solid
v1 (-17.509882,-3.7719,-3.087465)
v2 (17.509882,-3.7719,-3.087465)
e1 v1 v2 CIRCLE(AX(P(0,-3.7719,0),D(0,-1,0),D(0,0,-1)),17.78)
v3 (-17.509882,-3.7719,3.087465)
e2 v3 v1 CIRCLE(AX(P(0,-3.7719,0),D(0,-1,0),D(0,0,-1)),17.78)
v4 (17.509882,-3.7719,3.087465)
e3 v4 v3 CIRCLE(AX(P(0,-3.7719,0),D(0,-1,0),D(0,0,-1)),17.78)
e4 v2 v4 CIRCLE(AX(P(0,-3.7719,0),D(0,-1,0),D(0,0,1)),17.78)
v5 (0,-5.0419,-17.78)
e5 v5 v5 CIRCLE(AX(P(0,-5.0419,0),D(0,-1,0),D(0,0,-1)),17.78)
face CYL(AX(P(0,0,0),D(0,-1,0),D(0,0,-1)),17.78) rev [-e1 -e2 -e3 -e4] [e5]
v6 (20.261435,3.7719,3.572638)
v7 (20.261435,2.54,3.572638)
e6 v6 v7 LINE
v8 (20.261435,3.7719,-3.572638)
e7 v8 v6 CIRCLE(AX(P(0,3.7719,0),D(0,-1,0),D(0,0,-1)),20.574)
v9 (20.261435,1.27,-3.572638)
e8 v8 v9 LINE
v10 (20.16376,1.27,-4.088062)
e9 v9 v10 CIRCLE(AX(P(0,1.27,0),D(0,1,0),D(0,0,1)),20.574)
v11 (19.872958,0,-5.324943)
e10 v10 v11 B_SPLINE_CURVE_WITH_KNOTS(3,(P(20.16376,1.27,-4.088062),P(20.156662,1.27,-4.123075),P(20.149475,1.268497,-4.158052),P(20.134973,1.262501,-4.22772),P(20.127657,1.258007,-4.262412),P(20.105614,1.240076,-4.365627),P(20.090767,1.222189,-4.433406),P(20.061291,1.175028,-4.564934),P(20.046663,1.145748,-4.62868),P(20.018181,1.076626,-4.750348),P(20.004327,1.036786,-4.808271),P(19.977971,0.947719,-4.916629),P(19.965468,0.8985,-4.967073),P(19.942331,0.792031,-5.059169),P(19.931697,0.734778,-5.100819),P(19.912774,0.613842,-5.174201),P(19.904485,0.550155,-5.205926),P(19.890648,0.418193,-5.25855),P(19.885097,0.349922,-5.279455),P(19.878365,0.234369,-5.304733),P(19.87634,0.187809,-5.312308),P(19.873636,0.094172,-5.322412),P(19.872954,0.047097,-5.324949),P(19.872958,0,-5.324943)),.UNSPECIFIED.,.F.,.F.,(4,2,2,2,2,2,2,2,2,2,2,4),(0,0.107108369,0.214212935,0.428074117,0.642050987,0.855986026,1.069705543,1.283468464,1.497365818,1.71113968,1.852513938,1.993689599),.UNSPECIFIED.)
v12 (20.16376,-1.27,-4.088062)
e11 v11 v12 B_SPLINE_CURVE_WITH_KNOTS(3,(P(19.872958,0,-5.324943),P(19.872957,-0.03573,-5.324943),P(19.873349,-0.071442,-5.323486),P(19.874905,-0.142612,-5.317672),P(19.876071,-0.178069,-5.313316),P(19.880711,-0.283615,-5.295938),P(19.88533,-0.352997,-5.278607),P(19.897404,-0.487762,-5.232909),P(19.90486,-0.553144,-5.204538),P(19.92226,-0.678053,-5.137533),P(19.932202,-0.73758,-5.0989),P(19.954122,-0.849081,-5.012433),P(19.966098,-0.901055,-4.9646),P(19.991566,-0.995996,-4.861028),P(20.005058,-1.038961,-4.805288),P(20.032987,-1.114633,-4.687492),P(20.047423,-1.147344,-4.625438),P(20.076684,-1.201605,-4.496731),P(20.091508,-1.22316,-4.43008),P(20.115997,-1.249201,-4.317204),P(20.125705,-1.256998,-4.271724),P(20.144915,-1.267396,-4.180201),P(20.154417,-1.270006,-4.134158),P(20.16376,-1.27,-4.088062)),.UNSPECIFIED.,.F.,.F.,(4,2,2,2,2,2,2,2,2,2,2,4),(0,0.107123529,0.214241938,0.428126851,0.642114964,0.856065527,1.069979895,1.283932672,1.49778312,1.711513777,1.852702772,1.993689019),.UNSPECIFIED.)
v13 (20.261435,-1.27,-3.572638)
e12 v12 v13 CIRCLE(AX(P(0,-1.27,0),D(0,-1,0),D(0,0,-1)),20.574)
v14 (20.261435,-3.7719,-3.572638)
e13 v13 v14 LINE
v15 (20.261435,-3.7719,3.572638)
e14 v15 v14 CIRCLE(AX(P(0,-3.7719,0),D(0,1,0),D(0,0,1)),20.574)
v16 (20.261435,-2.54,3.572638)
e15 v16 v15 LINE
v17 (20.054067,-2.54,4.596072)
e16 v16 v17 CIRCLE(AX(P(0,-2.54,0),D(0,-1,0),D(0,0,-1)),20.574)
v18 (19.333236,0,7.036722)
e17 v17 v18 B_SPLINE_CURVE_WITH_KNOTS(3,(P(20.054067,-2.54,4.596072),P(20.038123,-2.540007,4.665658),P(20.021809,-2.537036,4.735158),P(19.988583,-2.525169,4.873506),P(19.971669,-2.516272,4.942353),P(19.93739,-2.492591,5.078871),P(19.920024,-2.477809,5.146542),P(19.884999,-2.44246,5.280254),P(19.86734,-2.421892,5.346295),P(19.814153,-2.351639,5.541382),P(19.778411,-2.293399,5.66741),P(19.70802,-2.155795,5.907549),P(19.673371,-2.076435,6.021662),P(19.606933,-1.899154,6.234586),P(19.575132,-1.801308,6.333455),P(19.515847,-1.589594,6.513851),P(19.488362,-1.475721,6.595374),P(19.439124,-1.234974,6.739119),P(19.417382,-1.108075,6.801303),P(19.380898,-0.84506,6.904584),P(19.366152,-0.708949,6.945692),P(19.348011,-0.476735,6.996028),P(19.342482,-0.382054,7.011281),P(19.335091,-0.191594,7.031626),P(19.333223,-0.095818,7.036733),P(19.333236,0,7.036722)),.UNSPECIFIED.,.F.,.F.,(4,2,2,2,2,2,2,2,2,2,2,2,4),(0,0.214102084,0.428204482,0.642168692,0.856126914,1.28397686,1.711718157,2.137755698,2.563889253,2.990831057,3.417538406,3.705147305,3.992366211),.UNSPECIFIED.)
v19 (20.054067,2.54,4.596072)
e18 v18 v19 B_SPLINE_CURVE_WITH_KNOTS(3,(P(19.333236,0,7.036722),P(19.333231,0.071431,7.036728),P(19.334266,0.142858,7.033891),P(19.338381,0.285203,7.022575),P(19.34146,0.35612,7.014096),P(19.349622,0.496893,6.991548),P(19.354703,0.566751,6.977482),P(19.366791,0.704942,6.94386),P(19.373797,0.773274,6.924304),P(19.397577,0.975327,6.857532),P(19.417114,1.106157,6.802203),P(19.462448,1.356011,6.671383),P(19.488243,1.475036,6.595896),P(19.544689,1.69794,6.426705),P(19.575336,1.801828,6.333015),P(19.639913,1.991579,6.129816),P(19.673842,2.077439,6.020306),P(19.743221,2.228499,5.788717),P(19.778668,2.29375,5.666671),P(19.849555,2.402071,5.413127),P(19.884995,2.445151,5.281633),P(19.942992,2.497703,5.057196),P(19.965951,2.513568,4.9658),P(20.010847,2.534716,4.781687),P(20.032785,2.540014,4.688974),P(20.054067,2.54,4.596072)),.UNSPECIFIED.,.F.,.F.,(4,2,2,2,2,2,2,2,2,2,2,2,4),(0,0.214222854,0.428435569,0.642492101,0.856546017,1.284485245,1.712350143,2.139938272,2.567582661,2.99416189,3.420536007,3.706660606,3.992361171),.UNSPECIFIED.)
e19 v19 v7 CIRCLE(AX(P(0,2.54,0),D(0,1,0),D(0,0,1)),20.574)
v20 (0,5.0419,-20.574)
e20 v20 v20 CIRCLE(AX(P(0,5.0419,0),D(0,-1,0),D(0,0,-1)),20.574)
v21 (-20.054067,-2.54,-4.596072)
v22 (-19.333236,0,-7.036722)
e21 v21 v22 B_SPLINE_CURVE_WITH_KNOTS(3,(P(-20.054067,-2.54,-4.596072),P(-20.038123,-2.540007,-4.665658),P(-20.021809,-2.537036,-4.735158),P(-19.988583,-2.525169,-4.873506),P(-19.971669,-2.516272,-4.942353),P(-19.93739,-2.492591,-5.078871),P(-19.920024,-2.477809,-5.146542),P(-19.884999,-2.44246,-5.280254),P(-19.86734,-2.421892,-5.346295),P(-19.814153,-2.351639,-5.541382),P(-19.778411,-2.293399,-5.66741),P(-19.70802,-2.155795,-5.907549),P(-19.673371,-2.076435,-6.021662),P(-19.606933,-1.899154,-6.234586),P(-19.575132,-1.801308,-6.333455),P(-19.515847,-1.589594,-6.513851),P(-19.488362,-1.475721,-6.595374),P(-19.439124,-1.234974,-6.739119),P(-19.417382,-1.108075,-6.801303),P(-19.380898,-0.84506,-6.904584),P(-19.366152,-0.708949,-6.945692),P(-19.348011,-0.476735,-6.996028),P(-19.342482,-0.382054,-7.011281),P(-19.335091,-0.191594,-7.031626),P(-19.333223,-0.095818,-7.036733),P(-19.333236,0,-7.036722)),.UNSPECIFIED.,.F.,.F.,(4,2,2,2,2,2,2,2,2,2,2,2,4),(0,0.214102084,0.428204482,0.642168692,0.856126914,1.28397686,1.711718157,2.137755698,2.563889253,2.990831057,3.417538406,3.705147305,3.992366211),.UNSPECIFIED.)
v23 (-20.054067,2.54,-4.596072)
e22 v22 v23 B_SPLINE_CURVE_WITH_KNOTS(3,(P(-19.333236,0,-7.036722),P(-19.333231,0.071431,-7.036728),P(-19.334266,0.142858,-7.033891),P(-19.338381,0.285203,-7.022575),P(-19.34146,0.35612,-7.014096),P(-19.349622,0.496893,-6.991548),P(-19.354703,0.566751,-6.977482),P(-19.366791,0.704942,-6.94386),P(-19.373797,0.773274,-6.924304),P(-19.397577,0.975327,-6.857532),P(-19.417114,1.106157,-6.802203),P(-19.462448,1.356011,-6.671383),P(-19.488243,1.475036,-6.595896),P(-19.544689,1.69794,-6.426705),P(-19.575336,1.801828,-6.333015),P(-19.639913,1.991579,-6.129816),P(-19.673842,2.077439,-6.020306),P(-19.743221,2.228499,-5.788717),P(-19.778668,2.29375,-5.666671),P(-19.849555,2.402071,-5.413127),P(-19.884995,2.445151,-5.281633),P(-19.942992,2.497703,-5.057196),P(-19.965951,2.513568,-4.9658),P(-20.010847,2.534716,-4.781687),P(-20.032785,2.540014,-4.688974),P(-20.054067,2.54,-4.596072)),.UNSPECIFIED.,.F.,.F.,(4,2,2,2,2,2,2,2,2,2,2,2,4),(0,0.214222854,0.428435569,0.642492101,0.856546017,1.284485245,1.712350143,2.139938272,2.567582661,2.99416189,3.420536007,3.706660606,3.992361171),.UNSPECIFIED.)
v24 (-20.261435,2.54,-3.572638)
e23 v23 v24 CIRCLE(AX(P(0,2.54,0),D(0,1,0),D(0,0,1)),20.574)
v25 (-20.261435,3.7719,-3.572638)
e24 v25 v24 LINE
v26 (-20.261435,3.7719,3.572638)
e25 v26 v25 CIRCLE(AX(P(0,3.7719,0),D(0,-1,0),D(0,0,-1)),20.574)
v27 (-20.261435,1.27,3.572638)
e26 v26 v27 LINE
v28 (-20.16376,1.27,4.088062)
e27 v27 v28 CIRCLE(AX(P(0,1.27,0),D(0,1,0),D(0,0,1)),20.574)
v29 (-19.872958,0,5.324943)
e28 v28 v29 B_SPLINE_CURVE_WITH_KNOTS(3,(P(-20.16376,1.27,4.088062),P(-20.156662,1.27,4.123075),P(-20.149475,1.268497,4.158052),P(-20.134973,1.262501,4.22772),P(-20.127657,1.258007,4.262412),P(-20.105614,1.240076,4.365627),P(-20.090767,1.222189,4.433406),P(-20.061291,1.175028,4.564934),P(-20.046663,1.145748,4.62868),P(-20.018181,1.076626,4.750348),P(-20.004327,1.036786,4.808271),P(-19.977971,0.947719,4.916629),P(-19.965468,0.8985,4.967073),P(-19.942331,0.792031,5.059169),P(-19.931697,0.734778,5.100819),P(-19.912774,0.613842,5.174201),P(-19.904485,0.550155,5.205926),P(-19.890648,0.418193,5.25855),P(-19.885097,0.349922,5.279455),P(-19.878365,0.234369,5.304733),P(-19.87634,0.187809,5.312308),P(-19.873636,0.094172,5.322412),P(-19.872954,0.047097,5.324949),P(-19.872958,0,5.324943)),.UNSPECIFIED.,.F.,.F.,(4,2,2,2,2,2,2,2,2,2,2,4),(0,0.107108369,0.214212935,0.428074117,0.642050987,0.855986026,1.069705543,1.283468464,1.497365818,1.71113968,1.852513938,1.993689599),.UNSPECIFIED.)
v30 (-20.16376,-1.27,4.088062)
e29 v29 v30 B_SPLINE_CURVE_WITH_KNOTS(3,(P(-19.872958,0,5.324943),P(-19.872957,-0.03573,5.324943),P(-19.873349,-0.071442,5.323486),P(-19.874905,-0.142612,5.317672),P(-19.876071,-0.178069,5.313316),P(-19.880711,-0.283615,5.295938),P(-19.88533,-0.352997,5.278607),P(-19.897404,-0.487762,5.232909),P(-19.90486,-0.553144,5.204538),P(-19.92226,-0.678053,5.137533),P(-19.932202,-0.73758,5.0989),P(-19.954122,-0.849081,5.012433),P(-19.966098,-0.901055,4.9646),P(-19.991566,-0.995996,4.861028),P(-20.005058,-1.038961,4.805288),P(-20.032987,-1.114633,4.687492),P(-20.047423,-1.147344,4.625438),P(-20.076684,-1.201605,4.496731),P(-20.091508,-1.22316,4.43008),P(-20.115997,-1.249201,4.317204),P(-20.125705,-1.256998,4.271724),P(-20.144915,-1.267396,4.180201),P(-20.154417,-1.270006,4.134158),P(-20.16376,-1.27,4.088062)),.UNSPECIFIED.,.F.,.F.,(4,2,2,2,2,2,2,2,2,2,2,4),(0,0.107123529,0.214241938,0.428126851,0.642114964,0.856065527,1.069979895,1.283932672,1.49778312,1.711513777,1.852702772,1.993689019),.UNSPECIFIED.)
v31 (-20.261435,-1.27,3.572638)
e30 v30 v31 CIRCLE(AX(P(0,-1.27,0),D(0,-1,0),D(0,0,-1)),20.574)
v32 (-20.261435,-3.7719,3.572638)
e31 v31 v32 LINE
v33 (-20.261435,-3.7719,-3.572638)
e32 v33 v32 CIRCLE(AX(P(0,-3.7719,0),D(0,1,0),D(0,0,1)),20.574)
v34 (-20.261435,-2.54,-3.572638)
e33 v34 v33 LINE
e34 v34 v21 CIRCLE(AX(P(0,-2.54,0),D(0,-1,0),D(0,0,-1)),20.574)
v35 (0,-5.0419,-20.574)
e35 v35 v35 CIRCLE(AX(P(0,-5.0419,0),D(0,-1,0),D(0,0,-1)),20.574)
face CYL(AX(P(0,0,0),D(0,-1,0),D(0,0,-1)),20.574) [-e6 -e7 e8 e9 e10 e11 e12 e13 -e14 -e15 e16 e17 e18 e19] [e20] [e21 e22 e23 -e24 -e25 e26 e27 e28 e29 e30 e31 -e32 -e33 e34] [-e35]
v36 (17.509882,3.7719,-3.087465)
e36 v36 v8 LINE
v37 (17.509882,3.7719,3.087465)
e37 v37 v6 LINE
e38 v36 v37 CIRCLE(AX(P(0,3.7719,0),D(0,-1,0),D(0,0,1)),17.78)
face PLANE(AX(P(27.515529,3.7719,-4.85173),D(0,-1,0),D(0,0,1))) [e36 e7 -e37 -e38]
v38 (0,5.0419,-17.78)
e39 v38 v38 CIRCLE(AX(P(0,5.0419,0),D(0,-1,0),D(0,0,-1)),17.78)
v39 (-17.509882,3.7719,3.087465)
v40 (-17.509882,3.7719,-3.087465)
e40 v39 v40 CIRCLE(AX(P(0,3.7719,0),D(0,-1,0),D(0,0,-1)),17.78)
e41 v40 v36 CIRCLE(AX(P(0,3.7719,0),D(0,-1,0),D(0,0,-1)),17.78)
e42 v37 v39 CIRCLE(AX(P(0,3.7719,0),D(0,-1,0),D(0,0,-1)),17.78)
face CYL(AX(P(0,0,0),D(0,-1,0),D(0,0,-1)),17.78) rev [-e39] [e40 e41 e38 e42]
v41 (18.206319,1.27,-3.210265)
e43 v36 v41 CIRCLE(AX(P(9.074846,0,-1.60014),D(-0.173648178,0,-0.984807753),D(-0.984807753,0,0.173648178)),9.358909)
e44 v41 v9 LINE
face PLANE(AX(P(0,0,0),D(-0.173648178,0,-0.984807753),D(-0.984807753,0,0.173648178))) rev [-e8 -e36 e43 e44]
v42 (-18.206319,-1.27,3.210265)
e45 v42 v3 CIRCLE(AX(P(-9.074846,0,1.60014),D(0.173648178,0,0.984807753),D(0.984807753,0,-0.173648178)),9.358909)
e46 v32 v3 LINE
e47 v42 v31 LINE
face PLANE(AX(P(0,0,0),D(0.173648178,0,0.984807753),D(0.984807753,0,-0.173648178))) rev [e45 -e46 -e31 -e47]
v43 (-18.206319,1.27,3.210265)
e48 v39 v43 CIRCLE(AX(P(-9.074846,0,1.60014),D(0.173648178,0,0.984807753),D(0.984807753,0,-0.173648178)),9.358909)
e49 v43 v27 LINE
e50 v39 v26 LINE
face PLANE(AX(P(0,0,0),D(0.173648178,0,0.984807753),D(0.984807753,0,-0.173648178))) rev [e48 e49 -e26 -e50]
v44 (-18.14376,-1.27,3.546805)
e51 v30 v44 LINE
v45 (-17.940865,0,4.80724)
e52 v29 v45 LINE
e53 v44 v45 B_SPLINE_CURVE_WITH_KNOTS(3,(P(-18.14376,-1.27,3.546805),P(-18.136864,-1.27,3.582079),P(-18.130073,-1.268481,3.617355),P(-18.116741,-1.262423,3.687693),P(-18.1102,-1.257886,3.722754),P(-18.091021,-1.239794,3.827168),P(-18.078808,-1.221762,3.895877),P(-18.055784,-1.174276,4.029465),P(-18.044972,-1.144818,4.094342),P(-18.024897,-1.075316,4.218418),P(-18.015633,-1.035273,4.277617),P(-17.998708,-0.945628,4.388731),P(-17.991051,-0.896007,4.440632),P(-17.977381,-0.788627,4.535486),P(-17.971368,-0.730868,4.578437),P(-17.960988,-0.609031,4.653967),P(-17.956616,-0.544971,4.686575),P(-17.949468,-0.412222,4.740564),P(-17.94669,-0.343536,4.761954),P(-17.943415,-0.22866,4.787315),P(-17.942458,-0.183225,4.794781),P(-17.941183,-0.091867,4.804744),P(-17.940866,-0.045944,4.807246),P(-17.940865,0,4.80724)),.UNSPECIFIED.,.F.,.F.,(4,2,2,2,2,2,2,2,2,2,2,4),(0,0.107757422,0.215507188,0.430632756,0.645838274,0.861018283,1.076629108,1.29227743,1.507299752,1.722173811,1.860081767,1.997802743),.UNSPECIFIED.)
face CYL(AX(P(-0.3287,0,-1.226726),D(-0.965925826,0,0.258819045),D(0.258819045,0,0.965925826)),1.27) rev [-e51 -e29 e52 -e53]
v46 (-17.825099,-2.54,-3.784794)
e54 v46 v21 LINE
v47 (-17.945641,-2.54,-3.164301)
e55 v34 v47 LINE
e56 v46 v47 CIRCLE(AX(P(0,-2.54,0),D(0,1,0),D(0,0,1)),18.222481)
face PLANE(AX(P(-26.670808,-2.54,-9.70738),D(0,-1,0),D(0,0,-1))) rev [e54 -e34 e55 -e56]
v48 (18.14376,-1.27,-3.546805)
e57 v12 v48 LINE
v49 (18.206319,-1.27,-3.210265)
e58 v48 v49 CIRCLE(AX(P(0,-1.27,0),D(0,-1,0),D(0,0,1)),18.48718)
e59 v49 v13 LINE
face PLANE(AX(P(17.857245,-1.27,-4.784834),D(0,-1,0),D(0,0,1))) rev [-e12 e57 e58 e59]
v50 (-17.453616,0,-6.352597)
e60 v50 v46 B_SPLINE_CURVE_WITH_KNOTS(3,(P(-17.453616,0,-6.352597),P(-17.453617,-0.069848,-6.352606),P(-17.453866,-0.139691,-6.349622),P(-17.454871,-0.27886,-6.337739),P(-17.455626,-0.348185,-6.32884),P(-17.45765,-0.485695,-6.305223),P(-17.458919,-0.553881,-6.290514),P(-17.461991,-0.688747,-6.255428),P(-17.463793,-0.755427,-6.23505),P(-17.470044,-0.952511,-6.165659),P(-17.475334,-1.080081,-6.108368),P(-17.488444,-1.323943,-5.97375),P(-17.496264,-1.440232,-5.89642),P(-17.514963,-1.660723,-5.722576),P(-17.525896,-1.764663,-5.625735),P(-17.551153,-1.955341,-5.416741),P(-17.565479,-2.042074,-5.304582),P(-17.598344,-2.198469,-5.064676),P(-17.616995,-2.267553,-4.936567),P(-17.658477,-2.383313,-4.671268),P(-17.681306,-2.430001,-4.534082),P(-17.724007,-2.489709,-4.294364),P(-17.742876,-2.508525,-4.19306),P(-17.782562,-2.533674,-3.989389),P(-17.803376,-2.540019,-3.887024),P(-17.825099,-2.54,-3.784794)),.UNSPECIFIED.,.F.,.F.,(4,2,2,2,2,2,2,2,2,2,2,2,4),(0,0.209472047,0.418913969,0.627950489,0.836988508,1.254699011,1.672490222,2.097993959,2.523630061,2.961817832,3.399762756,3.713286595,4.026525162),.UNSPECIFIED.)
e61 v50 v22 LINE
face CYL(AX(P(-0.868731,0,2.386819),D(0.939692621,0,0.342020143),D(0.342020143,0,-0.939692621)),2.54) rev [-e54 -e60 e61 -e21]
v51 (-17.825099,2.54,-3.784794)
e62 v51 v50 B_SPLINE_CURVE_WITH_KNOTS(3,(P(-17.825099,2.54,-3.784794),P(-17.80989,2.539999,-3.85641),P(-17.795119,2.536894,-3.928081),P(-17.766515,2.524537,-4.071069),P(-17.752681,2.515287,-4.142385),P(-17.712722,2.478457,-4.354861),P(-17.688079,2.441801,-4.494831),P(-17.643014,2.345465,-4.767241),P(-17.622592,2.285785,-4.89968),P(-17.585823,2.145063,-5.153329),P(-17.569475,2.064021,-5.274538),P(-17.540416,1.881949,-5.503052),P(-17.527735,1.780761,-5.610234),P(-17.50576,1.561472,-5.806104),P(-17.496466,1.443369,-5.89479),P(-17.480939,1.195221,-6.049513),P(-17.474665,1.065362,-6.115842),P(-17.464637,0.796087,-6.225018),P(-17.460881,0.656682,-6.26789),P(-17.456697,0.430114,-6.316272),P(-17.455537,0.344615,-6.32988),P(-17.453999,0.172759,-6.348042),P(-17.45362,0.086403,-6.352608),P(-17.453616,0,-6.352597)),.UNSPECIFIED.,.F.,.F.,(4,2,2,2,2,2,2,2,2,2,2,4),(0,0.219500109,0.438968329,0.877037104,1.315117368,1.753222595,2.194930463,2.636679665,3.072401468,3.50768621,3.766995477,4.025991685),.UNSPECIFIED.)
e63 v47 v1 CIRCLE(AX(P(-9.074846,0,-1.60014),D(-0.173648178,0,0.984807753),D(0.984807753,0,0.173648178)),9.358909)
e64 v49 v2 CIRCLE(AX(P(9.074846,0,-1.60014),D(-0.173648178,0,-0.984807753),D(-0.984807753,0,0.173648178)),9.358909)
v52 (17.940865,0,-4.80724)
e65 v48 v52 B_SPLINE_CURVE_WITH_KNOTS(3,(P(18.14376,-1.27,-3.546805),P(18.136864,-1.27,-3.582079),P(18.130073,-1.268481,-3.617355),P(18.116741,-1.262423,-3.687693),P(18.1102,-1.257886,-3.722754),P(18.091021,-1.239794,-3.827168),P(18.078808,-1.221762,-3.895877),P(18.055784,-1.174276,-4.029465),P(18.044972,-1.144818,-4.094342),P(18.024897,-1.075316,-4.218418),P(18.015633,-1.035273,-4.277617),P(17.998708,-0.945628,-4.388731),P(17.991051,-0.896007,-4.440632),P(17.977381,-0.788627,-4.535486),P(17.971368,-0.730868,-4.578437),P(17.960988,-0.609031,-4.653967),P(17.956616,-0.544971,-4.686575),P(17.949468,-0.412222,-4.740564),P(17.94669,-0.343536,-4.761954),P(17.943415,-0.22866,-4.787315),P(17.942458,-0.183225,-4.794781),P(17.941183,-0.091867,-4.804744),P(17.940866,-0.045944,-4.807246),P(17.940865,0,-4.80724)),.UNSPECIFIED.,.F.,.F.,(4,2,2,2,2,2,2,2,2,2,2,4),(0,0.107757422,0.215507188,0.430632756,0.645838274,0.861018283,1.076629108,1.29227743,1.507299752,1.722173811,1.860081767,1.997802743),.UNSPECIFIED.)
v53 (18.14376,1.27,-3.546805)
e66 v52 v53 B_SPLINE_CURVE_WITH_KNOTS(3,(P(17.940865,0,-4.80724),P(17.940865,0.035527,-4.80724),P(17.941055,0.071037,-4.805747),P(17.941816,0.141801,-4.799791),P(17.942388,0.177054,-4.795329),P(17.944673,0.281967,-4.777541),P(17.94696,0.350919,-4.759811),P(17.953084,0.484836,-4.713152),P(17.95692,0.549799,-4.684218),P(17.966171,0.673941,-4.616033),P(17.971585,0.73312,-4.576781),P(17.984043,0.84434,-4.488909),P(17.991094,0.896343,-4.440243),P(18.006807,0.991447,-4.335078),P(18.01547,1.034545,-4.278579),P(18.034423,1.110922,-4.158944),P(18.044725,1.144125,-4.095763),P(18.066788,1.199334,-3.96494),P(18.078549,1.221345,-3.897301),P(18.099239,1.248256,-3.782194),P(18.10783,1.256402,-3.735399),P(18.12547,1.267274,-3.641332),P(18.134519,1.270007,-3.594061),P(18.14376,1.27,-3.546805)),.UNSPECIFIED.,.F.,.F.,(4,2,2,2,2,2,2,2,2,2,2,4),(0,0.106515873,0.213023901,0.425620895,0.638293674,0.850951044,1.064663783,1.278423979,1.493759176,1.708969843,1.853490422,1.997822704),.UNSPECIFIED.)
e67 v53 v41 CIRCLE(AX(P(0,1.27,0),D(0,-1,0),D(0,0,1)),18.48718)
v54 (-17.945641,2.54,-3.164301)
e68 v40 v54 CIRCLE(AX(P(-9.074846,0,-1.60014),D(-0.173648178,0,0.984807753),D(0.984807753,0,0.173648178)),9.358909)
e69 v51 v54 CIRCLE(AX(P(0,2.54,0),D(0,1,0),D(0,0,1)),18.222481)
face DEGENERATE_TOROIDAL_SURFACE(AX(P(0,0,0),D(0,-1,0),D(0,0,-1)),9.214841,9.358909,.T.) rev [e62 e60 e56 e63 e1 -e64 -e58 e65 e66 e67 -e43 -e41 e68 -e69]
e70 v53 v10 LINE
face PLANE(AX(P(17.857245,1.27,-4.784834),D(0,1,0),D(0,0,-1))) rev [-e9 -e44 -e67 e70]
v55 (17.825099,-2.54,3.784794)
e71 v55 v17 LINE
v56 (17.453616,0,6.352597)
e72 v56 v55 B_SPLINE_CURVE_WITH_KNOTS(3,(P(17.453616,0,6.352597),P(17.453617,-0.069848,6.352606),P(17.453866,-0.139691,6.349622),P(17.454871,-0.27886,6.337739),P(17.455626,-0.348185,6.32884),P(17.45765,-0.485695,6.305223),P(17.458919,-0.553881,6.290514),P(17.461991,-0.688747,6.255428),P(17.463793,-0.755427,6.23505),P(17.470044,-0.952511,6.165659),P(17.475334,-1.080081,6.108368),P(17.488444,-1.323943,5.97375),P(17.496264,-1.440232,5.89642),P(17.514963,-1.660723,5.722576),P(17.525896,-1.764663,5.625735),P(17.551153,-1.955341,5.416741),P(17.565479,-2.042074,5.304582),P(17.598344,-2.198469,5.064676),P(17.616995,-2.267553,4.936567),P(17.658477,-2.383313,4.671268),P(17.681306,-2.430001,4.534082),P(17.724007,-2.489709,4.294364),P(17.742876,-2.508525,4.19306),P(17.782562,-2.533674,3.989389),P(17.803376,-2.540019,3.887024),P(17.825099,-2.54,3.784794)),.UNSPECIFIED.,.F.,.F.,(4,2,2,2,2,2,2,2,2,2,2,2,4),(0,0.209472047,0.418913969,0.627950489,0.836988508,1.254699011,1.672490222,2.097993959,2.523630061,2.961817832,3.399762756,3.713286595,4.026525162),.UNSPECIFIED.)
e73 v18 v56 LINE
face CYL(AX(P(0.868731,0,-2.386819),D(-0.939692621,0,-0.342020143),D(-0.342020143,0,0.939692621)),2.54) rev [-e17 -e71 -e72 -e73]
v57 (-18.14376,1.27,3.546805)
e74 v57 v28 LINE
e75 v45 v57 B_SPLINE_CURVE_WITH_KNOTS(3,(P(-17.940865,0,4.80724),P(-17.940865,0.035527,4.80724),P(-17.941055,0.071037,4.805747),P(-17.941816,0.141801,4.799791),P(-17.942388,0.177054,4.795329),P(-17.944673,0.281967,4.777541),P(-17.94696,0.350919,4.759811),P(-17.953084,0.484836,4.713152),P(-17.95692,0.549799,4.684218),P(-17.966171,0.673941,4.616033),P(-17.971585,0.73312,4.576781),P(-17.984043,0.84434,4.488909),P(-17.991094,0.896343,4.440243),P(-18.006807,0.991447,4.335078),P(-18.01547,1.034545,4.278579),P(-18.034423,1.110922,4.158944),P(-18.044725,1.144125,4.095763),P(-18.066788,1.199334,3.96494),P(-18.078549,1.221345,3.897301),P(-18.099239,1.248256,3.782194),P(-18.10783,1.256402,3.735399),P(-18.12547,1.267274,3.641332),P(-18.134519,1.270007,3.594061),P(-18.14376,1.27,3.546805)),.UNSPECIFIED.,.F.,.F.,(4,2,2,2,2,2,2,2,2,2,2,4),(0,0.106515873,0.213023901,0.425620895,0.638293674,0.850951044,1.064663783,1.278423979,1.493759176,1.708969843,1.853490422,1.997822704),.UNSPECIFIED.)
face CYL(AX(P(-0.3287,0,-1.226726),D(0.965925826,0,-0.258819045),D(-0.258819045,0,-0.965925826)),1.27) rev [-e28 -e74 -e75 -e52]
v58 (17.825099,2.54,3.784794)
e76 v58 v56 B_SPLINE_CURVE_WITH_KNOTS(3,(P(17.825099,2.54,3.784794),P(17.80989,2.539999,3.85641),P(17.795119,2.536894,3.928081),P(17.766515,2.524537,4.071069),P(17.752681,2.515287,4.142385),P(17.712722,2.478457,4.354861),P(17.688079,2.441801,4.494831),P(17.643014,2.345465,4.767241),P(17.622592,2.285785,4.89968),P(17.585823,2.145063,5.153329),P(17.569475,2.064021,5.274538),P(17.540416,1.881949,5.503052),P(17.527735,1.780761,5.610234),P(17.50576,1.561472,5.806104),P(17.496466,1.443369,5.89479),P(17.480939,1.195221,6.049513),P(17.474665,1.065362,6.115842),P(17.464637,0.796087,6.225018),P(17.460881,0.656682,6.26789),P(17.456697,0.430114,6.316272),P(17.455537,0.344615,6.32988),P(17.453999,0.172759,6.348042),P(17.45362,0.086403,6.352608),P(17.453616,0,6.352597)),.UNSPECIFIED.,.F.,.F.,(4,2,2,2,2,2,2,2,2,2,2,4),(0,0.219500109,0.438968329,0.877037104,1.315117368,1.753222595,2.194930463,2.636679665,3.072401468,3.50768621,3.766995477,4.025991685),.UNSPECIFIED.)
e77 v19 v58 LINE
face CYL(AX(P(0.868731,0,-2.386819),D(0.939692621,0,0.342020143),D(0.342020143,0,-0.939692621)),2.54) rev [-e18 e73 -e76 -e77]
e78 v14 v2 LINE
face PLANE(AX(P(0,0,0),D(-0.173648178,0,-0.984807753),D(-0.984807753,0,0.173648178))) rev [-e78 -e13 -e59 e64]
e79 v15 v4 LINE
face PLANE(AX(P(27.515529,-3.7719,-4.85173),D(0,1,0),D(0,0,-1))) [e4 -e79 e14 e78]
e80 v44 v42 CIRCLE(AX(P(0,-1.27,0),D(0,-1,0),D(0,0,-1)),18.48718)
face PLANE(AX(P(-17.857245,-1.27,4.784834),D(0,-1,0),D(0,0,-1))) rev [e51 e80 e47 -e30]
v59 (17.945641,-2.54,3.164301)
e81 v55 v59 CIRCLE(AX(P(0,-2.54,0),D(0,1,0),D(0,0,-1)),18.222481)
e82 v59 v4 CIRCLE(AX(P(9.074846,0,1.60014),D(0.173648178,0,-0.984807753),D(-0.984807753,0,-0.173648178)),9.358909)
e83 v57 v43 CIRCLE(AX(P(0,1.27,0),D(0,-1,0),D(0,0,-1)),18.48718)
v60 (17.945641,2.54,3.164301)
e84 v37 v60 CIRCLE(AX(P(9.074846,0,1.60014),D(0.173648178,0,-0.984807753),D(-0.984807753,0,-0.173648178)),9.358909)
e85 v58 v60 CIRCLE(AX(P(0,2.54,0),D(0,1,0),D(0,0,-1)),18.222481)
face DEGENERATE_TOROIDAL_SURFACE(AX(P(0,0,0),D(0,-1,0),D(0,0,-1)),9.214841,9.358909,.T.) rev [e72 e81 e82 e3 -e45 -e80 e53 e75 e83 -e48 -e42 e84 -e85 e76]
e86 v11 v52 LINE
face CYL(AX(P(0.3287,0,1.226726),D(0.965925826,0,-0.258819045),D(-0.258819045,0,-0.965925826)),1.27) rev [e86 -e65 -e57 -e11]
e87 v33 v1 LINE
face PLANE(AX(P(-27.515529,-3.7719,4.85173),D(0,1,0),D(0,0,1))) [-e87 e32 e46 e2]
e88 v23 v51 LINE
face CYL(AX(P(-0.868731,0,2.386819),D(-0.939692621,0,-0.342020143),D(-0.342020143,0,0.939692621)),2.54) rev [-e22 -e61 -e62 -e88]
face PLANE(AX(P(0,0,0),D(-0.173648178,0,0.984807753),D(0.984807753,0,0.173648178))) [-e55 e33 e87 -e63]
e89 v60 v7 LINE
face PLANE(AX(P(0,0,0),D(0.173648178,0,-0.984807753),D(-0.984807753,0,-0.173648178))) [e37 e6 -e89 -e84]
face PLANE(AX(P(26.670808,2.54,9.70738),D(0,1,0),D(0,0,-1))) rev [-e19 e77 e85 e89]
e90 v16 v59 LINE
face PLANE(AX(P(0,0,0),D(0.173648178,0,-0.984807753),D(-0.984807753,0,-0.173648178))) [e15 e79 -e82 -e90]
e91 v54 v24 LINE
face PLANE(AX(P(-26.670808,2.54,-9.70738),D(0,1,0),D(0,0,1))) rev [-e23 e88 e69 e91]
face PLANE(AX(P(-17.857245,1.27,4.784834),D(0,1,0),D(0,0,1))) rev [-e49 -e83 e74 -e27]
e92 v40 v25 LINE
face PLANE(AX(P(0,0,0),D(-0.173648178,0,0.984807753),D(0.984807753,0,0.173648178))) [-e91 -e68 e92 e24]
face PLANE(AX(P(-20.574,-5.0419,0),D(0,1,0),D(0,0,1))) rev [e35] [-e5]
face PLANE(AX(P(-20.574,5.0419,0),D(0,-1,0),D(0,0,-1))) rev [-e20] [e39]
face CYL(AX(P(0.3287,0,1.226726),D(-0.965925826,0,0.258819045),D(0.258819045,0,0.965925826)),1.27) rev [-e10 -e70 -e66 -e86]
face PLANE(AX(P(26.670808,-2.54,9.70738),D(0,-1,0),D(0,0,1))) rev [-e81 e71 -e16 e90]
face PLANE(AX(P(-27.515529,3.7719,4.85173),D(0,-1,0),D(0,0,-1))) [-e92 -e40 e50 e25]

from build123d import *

# Parameters (mm, degrees)
SKETCH1_W          = 2.794
SKETCH1_H          = 10.0838
SKETCH7_W          = 10.16
SKETCH7_H          = 7.5438
CUT_REVOLVE2_ANGLE = 20
SKETCH8_W          = 10.16
SKETCH8_H          = 5.08
CUT_REVOLVE3_ANGLE = 10
SKETCH9_W          = 10.16
SKETCH9_H          = 2.54
CUT_REVOLVE4_ANGLE = 5
CIRPATTERN2_COUNT  = 2
FILLET1_R          = 2.54
FILLET2_R          = 1.27


with BuildPart() as part:
    # Sketch1 → Revolve1 (revolve)
    with BuildSketch(Plane.XY, mode=Mode.PRIVATE) as revolve1_sk:
        with Locations((-19.177, 0)):
            Rectangle(SKETCH1_W, SKETCH1_H)
    revolve(revolve1_sk.sketch.rotate(Axis((0, 0, 0), (0, 1, 0)), 270), axis=Axis((0, 0, 0), (0, 1, 0)))

    # Sketch2 → Cut-Revolve1 (revolve, cut)
    with BuildSketch(Plane.XY, mode=Mode.PRIVATE) as cut_revolve1_sk:
        with BuildLine():
            Line((-17.78, 3.7719), (-15.24, 3.7719))
            Line((-15.24, 3.7719), (-15.24, -3.7719))
            Line((-15.24, -3.7719), (-17.78, -3.7719))
            ThreePointArc((-17.78, -3.7719), (-18.57375, 0), (-17.78, 3.7719))
        make_face()
    revolve(cut_revolve1_sk.sketch.rotate(Axis((0, 0, 0), (0, 1, 0)), 270), axis=Axis((0, 0, 0), (0, 1, 0)), mode=Mode.SUBTRACT)

    # Sketch7 → Cut-Revolve2 (revolve, symmetric, cut)
    with BuildSketch(Plane.XY) as cut_revolve2_sk:
        with Locations((-22.86, 0)):
            Rectangle(SKETCH7_W, SKETCH7_H)
    cut_revolve2 = revolve(axis=Axis((0, 0, 0), (0, 1, 0)), revolution_arc=CUT_REVOLVE2_ANGLE / 2, mode=Mode.SUBTRACT)
    cut_revolve2 = cut_revolve2 + revolve(cut_revolve2_sk.sketch, axis=Axis((0, 0, 0), (0, -1, 0)), revolution_arc=CUT_REVOLVE2_ANGLE / 2, mode=Mode.SUBTRACT)

    # Sketch8 → Cut-Revolve3 (revolve, cut)
    with BuildSketch(Plane(origin=(0, 0, 0), x_dir=(0.9848077530122081, 0, 0.17364817766693072), z_dir=(-0.17364817766693072, 0, 0.9848077530122081))):
        with Locations((-23.302480977, 0)):
            Rectangle(SKETCH8_W, SKETCH8_H)
    cut_revolve3 = revolve(axis=Axis((0, 0, 0), (0, -1, 0)), revolution_arc=CUT_REVOLVE3_ANGLE, mode=Mode.SUBTRACT)

    # Sketch9 → Cut-Revolve4 (revolve, cut)
    with BuildSketch(Plane(origin=(0, 0, 0), x_dir=(-0.9848077530122081, 0, 0.17364817766693075), z_dir=(-0.17364817766693075, 0, -0.9848077530122081))):
        with Locations((23.567180389, 0)):
            Rectangle(SKETCH9_W, SKETCH9_H)
    cut_revolve4 = revolve(axis=Axis((0, 0, 0), (0, 1, 0)), revolution_arc=CUT_REVOLVE4_ANGLE, mode=Mode.SUBTRACT)

    # CirPattern2: Cut-Revolve2, Cut-Revolve3, Cut-Revolve4 ×2 about axis
    cirpattern2_axis = Axis((0, 0, 0), (0, 1, 0))
    add([cut_revolve2.rotate(cirpattern2_axis, i * 360 / CIRPATTERN2_COUNT) for i in range(1, CIRPATTERN2_COUNT)], mode=Mode.SUBTRACT)
    add([cut_revolve3.rotate(cirpattern2_axis, i * 360 / CIRPATTERN2_COUNT) for i in range(1, CIRPATTERN2_COUNT)], mode=Mode.SUBTRACT)
    add([cut_revolve4.rotate(cirpattern2_axis, i * 360 / CIRPATTERN2_COUNT) for i in range(1, CIRPATTERN2_COUNT)], mode=Mode.SUBTRACT)

    # Fillet1
    fillet1_edges = [part.edges().sort_by_distance(p)[0] for p in [
        (18.228383443, 2.54, 6.634588992),
        (18.228383443, -2.54, 6.634588992),
        (-18.228383443, -2.54, -6.634588992),
        (-18.228383443, 2.54, -6.634588992),
    ]]
    fillet(fillet1_edges, radius=FILLET1_R - 0.0001)  # a hair under: the kernel refuses the full size

    # Fillet2
    fillet2_edges = [part.edges().sort_by_distance(p)[0] for p in [
        (-18.865101471, -1.27, 5.054888704),
        (-18.865101471, 1.27, 5.054888704),
        (18.865101471, -1.27, -5.054888704),
        (18.865101471, 1.27, -5.054888704),
    ]]
    fillet(fillet2_edges, radius=FILLET2_R - 0.0001)  # a hair under: the kernel refuses the full size


solid = part.part
